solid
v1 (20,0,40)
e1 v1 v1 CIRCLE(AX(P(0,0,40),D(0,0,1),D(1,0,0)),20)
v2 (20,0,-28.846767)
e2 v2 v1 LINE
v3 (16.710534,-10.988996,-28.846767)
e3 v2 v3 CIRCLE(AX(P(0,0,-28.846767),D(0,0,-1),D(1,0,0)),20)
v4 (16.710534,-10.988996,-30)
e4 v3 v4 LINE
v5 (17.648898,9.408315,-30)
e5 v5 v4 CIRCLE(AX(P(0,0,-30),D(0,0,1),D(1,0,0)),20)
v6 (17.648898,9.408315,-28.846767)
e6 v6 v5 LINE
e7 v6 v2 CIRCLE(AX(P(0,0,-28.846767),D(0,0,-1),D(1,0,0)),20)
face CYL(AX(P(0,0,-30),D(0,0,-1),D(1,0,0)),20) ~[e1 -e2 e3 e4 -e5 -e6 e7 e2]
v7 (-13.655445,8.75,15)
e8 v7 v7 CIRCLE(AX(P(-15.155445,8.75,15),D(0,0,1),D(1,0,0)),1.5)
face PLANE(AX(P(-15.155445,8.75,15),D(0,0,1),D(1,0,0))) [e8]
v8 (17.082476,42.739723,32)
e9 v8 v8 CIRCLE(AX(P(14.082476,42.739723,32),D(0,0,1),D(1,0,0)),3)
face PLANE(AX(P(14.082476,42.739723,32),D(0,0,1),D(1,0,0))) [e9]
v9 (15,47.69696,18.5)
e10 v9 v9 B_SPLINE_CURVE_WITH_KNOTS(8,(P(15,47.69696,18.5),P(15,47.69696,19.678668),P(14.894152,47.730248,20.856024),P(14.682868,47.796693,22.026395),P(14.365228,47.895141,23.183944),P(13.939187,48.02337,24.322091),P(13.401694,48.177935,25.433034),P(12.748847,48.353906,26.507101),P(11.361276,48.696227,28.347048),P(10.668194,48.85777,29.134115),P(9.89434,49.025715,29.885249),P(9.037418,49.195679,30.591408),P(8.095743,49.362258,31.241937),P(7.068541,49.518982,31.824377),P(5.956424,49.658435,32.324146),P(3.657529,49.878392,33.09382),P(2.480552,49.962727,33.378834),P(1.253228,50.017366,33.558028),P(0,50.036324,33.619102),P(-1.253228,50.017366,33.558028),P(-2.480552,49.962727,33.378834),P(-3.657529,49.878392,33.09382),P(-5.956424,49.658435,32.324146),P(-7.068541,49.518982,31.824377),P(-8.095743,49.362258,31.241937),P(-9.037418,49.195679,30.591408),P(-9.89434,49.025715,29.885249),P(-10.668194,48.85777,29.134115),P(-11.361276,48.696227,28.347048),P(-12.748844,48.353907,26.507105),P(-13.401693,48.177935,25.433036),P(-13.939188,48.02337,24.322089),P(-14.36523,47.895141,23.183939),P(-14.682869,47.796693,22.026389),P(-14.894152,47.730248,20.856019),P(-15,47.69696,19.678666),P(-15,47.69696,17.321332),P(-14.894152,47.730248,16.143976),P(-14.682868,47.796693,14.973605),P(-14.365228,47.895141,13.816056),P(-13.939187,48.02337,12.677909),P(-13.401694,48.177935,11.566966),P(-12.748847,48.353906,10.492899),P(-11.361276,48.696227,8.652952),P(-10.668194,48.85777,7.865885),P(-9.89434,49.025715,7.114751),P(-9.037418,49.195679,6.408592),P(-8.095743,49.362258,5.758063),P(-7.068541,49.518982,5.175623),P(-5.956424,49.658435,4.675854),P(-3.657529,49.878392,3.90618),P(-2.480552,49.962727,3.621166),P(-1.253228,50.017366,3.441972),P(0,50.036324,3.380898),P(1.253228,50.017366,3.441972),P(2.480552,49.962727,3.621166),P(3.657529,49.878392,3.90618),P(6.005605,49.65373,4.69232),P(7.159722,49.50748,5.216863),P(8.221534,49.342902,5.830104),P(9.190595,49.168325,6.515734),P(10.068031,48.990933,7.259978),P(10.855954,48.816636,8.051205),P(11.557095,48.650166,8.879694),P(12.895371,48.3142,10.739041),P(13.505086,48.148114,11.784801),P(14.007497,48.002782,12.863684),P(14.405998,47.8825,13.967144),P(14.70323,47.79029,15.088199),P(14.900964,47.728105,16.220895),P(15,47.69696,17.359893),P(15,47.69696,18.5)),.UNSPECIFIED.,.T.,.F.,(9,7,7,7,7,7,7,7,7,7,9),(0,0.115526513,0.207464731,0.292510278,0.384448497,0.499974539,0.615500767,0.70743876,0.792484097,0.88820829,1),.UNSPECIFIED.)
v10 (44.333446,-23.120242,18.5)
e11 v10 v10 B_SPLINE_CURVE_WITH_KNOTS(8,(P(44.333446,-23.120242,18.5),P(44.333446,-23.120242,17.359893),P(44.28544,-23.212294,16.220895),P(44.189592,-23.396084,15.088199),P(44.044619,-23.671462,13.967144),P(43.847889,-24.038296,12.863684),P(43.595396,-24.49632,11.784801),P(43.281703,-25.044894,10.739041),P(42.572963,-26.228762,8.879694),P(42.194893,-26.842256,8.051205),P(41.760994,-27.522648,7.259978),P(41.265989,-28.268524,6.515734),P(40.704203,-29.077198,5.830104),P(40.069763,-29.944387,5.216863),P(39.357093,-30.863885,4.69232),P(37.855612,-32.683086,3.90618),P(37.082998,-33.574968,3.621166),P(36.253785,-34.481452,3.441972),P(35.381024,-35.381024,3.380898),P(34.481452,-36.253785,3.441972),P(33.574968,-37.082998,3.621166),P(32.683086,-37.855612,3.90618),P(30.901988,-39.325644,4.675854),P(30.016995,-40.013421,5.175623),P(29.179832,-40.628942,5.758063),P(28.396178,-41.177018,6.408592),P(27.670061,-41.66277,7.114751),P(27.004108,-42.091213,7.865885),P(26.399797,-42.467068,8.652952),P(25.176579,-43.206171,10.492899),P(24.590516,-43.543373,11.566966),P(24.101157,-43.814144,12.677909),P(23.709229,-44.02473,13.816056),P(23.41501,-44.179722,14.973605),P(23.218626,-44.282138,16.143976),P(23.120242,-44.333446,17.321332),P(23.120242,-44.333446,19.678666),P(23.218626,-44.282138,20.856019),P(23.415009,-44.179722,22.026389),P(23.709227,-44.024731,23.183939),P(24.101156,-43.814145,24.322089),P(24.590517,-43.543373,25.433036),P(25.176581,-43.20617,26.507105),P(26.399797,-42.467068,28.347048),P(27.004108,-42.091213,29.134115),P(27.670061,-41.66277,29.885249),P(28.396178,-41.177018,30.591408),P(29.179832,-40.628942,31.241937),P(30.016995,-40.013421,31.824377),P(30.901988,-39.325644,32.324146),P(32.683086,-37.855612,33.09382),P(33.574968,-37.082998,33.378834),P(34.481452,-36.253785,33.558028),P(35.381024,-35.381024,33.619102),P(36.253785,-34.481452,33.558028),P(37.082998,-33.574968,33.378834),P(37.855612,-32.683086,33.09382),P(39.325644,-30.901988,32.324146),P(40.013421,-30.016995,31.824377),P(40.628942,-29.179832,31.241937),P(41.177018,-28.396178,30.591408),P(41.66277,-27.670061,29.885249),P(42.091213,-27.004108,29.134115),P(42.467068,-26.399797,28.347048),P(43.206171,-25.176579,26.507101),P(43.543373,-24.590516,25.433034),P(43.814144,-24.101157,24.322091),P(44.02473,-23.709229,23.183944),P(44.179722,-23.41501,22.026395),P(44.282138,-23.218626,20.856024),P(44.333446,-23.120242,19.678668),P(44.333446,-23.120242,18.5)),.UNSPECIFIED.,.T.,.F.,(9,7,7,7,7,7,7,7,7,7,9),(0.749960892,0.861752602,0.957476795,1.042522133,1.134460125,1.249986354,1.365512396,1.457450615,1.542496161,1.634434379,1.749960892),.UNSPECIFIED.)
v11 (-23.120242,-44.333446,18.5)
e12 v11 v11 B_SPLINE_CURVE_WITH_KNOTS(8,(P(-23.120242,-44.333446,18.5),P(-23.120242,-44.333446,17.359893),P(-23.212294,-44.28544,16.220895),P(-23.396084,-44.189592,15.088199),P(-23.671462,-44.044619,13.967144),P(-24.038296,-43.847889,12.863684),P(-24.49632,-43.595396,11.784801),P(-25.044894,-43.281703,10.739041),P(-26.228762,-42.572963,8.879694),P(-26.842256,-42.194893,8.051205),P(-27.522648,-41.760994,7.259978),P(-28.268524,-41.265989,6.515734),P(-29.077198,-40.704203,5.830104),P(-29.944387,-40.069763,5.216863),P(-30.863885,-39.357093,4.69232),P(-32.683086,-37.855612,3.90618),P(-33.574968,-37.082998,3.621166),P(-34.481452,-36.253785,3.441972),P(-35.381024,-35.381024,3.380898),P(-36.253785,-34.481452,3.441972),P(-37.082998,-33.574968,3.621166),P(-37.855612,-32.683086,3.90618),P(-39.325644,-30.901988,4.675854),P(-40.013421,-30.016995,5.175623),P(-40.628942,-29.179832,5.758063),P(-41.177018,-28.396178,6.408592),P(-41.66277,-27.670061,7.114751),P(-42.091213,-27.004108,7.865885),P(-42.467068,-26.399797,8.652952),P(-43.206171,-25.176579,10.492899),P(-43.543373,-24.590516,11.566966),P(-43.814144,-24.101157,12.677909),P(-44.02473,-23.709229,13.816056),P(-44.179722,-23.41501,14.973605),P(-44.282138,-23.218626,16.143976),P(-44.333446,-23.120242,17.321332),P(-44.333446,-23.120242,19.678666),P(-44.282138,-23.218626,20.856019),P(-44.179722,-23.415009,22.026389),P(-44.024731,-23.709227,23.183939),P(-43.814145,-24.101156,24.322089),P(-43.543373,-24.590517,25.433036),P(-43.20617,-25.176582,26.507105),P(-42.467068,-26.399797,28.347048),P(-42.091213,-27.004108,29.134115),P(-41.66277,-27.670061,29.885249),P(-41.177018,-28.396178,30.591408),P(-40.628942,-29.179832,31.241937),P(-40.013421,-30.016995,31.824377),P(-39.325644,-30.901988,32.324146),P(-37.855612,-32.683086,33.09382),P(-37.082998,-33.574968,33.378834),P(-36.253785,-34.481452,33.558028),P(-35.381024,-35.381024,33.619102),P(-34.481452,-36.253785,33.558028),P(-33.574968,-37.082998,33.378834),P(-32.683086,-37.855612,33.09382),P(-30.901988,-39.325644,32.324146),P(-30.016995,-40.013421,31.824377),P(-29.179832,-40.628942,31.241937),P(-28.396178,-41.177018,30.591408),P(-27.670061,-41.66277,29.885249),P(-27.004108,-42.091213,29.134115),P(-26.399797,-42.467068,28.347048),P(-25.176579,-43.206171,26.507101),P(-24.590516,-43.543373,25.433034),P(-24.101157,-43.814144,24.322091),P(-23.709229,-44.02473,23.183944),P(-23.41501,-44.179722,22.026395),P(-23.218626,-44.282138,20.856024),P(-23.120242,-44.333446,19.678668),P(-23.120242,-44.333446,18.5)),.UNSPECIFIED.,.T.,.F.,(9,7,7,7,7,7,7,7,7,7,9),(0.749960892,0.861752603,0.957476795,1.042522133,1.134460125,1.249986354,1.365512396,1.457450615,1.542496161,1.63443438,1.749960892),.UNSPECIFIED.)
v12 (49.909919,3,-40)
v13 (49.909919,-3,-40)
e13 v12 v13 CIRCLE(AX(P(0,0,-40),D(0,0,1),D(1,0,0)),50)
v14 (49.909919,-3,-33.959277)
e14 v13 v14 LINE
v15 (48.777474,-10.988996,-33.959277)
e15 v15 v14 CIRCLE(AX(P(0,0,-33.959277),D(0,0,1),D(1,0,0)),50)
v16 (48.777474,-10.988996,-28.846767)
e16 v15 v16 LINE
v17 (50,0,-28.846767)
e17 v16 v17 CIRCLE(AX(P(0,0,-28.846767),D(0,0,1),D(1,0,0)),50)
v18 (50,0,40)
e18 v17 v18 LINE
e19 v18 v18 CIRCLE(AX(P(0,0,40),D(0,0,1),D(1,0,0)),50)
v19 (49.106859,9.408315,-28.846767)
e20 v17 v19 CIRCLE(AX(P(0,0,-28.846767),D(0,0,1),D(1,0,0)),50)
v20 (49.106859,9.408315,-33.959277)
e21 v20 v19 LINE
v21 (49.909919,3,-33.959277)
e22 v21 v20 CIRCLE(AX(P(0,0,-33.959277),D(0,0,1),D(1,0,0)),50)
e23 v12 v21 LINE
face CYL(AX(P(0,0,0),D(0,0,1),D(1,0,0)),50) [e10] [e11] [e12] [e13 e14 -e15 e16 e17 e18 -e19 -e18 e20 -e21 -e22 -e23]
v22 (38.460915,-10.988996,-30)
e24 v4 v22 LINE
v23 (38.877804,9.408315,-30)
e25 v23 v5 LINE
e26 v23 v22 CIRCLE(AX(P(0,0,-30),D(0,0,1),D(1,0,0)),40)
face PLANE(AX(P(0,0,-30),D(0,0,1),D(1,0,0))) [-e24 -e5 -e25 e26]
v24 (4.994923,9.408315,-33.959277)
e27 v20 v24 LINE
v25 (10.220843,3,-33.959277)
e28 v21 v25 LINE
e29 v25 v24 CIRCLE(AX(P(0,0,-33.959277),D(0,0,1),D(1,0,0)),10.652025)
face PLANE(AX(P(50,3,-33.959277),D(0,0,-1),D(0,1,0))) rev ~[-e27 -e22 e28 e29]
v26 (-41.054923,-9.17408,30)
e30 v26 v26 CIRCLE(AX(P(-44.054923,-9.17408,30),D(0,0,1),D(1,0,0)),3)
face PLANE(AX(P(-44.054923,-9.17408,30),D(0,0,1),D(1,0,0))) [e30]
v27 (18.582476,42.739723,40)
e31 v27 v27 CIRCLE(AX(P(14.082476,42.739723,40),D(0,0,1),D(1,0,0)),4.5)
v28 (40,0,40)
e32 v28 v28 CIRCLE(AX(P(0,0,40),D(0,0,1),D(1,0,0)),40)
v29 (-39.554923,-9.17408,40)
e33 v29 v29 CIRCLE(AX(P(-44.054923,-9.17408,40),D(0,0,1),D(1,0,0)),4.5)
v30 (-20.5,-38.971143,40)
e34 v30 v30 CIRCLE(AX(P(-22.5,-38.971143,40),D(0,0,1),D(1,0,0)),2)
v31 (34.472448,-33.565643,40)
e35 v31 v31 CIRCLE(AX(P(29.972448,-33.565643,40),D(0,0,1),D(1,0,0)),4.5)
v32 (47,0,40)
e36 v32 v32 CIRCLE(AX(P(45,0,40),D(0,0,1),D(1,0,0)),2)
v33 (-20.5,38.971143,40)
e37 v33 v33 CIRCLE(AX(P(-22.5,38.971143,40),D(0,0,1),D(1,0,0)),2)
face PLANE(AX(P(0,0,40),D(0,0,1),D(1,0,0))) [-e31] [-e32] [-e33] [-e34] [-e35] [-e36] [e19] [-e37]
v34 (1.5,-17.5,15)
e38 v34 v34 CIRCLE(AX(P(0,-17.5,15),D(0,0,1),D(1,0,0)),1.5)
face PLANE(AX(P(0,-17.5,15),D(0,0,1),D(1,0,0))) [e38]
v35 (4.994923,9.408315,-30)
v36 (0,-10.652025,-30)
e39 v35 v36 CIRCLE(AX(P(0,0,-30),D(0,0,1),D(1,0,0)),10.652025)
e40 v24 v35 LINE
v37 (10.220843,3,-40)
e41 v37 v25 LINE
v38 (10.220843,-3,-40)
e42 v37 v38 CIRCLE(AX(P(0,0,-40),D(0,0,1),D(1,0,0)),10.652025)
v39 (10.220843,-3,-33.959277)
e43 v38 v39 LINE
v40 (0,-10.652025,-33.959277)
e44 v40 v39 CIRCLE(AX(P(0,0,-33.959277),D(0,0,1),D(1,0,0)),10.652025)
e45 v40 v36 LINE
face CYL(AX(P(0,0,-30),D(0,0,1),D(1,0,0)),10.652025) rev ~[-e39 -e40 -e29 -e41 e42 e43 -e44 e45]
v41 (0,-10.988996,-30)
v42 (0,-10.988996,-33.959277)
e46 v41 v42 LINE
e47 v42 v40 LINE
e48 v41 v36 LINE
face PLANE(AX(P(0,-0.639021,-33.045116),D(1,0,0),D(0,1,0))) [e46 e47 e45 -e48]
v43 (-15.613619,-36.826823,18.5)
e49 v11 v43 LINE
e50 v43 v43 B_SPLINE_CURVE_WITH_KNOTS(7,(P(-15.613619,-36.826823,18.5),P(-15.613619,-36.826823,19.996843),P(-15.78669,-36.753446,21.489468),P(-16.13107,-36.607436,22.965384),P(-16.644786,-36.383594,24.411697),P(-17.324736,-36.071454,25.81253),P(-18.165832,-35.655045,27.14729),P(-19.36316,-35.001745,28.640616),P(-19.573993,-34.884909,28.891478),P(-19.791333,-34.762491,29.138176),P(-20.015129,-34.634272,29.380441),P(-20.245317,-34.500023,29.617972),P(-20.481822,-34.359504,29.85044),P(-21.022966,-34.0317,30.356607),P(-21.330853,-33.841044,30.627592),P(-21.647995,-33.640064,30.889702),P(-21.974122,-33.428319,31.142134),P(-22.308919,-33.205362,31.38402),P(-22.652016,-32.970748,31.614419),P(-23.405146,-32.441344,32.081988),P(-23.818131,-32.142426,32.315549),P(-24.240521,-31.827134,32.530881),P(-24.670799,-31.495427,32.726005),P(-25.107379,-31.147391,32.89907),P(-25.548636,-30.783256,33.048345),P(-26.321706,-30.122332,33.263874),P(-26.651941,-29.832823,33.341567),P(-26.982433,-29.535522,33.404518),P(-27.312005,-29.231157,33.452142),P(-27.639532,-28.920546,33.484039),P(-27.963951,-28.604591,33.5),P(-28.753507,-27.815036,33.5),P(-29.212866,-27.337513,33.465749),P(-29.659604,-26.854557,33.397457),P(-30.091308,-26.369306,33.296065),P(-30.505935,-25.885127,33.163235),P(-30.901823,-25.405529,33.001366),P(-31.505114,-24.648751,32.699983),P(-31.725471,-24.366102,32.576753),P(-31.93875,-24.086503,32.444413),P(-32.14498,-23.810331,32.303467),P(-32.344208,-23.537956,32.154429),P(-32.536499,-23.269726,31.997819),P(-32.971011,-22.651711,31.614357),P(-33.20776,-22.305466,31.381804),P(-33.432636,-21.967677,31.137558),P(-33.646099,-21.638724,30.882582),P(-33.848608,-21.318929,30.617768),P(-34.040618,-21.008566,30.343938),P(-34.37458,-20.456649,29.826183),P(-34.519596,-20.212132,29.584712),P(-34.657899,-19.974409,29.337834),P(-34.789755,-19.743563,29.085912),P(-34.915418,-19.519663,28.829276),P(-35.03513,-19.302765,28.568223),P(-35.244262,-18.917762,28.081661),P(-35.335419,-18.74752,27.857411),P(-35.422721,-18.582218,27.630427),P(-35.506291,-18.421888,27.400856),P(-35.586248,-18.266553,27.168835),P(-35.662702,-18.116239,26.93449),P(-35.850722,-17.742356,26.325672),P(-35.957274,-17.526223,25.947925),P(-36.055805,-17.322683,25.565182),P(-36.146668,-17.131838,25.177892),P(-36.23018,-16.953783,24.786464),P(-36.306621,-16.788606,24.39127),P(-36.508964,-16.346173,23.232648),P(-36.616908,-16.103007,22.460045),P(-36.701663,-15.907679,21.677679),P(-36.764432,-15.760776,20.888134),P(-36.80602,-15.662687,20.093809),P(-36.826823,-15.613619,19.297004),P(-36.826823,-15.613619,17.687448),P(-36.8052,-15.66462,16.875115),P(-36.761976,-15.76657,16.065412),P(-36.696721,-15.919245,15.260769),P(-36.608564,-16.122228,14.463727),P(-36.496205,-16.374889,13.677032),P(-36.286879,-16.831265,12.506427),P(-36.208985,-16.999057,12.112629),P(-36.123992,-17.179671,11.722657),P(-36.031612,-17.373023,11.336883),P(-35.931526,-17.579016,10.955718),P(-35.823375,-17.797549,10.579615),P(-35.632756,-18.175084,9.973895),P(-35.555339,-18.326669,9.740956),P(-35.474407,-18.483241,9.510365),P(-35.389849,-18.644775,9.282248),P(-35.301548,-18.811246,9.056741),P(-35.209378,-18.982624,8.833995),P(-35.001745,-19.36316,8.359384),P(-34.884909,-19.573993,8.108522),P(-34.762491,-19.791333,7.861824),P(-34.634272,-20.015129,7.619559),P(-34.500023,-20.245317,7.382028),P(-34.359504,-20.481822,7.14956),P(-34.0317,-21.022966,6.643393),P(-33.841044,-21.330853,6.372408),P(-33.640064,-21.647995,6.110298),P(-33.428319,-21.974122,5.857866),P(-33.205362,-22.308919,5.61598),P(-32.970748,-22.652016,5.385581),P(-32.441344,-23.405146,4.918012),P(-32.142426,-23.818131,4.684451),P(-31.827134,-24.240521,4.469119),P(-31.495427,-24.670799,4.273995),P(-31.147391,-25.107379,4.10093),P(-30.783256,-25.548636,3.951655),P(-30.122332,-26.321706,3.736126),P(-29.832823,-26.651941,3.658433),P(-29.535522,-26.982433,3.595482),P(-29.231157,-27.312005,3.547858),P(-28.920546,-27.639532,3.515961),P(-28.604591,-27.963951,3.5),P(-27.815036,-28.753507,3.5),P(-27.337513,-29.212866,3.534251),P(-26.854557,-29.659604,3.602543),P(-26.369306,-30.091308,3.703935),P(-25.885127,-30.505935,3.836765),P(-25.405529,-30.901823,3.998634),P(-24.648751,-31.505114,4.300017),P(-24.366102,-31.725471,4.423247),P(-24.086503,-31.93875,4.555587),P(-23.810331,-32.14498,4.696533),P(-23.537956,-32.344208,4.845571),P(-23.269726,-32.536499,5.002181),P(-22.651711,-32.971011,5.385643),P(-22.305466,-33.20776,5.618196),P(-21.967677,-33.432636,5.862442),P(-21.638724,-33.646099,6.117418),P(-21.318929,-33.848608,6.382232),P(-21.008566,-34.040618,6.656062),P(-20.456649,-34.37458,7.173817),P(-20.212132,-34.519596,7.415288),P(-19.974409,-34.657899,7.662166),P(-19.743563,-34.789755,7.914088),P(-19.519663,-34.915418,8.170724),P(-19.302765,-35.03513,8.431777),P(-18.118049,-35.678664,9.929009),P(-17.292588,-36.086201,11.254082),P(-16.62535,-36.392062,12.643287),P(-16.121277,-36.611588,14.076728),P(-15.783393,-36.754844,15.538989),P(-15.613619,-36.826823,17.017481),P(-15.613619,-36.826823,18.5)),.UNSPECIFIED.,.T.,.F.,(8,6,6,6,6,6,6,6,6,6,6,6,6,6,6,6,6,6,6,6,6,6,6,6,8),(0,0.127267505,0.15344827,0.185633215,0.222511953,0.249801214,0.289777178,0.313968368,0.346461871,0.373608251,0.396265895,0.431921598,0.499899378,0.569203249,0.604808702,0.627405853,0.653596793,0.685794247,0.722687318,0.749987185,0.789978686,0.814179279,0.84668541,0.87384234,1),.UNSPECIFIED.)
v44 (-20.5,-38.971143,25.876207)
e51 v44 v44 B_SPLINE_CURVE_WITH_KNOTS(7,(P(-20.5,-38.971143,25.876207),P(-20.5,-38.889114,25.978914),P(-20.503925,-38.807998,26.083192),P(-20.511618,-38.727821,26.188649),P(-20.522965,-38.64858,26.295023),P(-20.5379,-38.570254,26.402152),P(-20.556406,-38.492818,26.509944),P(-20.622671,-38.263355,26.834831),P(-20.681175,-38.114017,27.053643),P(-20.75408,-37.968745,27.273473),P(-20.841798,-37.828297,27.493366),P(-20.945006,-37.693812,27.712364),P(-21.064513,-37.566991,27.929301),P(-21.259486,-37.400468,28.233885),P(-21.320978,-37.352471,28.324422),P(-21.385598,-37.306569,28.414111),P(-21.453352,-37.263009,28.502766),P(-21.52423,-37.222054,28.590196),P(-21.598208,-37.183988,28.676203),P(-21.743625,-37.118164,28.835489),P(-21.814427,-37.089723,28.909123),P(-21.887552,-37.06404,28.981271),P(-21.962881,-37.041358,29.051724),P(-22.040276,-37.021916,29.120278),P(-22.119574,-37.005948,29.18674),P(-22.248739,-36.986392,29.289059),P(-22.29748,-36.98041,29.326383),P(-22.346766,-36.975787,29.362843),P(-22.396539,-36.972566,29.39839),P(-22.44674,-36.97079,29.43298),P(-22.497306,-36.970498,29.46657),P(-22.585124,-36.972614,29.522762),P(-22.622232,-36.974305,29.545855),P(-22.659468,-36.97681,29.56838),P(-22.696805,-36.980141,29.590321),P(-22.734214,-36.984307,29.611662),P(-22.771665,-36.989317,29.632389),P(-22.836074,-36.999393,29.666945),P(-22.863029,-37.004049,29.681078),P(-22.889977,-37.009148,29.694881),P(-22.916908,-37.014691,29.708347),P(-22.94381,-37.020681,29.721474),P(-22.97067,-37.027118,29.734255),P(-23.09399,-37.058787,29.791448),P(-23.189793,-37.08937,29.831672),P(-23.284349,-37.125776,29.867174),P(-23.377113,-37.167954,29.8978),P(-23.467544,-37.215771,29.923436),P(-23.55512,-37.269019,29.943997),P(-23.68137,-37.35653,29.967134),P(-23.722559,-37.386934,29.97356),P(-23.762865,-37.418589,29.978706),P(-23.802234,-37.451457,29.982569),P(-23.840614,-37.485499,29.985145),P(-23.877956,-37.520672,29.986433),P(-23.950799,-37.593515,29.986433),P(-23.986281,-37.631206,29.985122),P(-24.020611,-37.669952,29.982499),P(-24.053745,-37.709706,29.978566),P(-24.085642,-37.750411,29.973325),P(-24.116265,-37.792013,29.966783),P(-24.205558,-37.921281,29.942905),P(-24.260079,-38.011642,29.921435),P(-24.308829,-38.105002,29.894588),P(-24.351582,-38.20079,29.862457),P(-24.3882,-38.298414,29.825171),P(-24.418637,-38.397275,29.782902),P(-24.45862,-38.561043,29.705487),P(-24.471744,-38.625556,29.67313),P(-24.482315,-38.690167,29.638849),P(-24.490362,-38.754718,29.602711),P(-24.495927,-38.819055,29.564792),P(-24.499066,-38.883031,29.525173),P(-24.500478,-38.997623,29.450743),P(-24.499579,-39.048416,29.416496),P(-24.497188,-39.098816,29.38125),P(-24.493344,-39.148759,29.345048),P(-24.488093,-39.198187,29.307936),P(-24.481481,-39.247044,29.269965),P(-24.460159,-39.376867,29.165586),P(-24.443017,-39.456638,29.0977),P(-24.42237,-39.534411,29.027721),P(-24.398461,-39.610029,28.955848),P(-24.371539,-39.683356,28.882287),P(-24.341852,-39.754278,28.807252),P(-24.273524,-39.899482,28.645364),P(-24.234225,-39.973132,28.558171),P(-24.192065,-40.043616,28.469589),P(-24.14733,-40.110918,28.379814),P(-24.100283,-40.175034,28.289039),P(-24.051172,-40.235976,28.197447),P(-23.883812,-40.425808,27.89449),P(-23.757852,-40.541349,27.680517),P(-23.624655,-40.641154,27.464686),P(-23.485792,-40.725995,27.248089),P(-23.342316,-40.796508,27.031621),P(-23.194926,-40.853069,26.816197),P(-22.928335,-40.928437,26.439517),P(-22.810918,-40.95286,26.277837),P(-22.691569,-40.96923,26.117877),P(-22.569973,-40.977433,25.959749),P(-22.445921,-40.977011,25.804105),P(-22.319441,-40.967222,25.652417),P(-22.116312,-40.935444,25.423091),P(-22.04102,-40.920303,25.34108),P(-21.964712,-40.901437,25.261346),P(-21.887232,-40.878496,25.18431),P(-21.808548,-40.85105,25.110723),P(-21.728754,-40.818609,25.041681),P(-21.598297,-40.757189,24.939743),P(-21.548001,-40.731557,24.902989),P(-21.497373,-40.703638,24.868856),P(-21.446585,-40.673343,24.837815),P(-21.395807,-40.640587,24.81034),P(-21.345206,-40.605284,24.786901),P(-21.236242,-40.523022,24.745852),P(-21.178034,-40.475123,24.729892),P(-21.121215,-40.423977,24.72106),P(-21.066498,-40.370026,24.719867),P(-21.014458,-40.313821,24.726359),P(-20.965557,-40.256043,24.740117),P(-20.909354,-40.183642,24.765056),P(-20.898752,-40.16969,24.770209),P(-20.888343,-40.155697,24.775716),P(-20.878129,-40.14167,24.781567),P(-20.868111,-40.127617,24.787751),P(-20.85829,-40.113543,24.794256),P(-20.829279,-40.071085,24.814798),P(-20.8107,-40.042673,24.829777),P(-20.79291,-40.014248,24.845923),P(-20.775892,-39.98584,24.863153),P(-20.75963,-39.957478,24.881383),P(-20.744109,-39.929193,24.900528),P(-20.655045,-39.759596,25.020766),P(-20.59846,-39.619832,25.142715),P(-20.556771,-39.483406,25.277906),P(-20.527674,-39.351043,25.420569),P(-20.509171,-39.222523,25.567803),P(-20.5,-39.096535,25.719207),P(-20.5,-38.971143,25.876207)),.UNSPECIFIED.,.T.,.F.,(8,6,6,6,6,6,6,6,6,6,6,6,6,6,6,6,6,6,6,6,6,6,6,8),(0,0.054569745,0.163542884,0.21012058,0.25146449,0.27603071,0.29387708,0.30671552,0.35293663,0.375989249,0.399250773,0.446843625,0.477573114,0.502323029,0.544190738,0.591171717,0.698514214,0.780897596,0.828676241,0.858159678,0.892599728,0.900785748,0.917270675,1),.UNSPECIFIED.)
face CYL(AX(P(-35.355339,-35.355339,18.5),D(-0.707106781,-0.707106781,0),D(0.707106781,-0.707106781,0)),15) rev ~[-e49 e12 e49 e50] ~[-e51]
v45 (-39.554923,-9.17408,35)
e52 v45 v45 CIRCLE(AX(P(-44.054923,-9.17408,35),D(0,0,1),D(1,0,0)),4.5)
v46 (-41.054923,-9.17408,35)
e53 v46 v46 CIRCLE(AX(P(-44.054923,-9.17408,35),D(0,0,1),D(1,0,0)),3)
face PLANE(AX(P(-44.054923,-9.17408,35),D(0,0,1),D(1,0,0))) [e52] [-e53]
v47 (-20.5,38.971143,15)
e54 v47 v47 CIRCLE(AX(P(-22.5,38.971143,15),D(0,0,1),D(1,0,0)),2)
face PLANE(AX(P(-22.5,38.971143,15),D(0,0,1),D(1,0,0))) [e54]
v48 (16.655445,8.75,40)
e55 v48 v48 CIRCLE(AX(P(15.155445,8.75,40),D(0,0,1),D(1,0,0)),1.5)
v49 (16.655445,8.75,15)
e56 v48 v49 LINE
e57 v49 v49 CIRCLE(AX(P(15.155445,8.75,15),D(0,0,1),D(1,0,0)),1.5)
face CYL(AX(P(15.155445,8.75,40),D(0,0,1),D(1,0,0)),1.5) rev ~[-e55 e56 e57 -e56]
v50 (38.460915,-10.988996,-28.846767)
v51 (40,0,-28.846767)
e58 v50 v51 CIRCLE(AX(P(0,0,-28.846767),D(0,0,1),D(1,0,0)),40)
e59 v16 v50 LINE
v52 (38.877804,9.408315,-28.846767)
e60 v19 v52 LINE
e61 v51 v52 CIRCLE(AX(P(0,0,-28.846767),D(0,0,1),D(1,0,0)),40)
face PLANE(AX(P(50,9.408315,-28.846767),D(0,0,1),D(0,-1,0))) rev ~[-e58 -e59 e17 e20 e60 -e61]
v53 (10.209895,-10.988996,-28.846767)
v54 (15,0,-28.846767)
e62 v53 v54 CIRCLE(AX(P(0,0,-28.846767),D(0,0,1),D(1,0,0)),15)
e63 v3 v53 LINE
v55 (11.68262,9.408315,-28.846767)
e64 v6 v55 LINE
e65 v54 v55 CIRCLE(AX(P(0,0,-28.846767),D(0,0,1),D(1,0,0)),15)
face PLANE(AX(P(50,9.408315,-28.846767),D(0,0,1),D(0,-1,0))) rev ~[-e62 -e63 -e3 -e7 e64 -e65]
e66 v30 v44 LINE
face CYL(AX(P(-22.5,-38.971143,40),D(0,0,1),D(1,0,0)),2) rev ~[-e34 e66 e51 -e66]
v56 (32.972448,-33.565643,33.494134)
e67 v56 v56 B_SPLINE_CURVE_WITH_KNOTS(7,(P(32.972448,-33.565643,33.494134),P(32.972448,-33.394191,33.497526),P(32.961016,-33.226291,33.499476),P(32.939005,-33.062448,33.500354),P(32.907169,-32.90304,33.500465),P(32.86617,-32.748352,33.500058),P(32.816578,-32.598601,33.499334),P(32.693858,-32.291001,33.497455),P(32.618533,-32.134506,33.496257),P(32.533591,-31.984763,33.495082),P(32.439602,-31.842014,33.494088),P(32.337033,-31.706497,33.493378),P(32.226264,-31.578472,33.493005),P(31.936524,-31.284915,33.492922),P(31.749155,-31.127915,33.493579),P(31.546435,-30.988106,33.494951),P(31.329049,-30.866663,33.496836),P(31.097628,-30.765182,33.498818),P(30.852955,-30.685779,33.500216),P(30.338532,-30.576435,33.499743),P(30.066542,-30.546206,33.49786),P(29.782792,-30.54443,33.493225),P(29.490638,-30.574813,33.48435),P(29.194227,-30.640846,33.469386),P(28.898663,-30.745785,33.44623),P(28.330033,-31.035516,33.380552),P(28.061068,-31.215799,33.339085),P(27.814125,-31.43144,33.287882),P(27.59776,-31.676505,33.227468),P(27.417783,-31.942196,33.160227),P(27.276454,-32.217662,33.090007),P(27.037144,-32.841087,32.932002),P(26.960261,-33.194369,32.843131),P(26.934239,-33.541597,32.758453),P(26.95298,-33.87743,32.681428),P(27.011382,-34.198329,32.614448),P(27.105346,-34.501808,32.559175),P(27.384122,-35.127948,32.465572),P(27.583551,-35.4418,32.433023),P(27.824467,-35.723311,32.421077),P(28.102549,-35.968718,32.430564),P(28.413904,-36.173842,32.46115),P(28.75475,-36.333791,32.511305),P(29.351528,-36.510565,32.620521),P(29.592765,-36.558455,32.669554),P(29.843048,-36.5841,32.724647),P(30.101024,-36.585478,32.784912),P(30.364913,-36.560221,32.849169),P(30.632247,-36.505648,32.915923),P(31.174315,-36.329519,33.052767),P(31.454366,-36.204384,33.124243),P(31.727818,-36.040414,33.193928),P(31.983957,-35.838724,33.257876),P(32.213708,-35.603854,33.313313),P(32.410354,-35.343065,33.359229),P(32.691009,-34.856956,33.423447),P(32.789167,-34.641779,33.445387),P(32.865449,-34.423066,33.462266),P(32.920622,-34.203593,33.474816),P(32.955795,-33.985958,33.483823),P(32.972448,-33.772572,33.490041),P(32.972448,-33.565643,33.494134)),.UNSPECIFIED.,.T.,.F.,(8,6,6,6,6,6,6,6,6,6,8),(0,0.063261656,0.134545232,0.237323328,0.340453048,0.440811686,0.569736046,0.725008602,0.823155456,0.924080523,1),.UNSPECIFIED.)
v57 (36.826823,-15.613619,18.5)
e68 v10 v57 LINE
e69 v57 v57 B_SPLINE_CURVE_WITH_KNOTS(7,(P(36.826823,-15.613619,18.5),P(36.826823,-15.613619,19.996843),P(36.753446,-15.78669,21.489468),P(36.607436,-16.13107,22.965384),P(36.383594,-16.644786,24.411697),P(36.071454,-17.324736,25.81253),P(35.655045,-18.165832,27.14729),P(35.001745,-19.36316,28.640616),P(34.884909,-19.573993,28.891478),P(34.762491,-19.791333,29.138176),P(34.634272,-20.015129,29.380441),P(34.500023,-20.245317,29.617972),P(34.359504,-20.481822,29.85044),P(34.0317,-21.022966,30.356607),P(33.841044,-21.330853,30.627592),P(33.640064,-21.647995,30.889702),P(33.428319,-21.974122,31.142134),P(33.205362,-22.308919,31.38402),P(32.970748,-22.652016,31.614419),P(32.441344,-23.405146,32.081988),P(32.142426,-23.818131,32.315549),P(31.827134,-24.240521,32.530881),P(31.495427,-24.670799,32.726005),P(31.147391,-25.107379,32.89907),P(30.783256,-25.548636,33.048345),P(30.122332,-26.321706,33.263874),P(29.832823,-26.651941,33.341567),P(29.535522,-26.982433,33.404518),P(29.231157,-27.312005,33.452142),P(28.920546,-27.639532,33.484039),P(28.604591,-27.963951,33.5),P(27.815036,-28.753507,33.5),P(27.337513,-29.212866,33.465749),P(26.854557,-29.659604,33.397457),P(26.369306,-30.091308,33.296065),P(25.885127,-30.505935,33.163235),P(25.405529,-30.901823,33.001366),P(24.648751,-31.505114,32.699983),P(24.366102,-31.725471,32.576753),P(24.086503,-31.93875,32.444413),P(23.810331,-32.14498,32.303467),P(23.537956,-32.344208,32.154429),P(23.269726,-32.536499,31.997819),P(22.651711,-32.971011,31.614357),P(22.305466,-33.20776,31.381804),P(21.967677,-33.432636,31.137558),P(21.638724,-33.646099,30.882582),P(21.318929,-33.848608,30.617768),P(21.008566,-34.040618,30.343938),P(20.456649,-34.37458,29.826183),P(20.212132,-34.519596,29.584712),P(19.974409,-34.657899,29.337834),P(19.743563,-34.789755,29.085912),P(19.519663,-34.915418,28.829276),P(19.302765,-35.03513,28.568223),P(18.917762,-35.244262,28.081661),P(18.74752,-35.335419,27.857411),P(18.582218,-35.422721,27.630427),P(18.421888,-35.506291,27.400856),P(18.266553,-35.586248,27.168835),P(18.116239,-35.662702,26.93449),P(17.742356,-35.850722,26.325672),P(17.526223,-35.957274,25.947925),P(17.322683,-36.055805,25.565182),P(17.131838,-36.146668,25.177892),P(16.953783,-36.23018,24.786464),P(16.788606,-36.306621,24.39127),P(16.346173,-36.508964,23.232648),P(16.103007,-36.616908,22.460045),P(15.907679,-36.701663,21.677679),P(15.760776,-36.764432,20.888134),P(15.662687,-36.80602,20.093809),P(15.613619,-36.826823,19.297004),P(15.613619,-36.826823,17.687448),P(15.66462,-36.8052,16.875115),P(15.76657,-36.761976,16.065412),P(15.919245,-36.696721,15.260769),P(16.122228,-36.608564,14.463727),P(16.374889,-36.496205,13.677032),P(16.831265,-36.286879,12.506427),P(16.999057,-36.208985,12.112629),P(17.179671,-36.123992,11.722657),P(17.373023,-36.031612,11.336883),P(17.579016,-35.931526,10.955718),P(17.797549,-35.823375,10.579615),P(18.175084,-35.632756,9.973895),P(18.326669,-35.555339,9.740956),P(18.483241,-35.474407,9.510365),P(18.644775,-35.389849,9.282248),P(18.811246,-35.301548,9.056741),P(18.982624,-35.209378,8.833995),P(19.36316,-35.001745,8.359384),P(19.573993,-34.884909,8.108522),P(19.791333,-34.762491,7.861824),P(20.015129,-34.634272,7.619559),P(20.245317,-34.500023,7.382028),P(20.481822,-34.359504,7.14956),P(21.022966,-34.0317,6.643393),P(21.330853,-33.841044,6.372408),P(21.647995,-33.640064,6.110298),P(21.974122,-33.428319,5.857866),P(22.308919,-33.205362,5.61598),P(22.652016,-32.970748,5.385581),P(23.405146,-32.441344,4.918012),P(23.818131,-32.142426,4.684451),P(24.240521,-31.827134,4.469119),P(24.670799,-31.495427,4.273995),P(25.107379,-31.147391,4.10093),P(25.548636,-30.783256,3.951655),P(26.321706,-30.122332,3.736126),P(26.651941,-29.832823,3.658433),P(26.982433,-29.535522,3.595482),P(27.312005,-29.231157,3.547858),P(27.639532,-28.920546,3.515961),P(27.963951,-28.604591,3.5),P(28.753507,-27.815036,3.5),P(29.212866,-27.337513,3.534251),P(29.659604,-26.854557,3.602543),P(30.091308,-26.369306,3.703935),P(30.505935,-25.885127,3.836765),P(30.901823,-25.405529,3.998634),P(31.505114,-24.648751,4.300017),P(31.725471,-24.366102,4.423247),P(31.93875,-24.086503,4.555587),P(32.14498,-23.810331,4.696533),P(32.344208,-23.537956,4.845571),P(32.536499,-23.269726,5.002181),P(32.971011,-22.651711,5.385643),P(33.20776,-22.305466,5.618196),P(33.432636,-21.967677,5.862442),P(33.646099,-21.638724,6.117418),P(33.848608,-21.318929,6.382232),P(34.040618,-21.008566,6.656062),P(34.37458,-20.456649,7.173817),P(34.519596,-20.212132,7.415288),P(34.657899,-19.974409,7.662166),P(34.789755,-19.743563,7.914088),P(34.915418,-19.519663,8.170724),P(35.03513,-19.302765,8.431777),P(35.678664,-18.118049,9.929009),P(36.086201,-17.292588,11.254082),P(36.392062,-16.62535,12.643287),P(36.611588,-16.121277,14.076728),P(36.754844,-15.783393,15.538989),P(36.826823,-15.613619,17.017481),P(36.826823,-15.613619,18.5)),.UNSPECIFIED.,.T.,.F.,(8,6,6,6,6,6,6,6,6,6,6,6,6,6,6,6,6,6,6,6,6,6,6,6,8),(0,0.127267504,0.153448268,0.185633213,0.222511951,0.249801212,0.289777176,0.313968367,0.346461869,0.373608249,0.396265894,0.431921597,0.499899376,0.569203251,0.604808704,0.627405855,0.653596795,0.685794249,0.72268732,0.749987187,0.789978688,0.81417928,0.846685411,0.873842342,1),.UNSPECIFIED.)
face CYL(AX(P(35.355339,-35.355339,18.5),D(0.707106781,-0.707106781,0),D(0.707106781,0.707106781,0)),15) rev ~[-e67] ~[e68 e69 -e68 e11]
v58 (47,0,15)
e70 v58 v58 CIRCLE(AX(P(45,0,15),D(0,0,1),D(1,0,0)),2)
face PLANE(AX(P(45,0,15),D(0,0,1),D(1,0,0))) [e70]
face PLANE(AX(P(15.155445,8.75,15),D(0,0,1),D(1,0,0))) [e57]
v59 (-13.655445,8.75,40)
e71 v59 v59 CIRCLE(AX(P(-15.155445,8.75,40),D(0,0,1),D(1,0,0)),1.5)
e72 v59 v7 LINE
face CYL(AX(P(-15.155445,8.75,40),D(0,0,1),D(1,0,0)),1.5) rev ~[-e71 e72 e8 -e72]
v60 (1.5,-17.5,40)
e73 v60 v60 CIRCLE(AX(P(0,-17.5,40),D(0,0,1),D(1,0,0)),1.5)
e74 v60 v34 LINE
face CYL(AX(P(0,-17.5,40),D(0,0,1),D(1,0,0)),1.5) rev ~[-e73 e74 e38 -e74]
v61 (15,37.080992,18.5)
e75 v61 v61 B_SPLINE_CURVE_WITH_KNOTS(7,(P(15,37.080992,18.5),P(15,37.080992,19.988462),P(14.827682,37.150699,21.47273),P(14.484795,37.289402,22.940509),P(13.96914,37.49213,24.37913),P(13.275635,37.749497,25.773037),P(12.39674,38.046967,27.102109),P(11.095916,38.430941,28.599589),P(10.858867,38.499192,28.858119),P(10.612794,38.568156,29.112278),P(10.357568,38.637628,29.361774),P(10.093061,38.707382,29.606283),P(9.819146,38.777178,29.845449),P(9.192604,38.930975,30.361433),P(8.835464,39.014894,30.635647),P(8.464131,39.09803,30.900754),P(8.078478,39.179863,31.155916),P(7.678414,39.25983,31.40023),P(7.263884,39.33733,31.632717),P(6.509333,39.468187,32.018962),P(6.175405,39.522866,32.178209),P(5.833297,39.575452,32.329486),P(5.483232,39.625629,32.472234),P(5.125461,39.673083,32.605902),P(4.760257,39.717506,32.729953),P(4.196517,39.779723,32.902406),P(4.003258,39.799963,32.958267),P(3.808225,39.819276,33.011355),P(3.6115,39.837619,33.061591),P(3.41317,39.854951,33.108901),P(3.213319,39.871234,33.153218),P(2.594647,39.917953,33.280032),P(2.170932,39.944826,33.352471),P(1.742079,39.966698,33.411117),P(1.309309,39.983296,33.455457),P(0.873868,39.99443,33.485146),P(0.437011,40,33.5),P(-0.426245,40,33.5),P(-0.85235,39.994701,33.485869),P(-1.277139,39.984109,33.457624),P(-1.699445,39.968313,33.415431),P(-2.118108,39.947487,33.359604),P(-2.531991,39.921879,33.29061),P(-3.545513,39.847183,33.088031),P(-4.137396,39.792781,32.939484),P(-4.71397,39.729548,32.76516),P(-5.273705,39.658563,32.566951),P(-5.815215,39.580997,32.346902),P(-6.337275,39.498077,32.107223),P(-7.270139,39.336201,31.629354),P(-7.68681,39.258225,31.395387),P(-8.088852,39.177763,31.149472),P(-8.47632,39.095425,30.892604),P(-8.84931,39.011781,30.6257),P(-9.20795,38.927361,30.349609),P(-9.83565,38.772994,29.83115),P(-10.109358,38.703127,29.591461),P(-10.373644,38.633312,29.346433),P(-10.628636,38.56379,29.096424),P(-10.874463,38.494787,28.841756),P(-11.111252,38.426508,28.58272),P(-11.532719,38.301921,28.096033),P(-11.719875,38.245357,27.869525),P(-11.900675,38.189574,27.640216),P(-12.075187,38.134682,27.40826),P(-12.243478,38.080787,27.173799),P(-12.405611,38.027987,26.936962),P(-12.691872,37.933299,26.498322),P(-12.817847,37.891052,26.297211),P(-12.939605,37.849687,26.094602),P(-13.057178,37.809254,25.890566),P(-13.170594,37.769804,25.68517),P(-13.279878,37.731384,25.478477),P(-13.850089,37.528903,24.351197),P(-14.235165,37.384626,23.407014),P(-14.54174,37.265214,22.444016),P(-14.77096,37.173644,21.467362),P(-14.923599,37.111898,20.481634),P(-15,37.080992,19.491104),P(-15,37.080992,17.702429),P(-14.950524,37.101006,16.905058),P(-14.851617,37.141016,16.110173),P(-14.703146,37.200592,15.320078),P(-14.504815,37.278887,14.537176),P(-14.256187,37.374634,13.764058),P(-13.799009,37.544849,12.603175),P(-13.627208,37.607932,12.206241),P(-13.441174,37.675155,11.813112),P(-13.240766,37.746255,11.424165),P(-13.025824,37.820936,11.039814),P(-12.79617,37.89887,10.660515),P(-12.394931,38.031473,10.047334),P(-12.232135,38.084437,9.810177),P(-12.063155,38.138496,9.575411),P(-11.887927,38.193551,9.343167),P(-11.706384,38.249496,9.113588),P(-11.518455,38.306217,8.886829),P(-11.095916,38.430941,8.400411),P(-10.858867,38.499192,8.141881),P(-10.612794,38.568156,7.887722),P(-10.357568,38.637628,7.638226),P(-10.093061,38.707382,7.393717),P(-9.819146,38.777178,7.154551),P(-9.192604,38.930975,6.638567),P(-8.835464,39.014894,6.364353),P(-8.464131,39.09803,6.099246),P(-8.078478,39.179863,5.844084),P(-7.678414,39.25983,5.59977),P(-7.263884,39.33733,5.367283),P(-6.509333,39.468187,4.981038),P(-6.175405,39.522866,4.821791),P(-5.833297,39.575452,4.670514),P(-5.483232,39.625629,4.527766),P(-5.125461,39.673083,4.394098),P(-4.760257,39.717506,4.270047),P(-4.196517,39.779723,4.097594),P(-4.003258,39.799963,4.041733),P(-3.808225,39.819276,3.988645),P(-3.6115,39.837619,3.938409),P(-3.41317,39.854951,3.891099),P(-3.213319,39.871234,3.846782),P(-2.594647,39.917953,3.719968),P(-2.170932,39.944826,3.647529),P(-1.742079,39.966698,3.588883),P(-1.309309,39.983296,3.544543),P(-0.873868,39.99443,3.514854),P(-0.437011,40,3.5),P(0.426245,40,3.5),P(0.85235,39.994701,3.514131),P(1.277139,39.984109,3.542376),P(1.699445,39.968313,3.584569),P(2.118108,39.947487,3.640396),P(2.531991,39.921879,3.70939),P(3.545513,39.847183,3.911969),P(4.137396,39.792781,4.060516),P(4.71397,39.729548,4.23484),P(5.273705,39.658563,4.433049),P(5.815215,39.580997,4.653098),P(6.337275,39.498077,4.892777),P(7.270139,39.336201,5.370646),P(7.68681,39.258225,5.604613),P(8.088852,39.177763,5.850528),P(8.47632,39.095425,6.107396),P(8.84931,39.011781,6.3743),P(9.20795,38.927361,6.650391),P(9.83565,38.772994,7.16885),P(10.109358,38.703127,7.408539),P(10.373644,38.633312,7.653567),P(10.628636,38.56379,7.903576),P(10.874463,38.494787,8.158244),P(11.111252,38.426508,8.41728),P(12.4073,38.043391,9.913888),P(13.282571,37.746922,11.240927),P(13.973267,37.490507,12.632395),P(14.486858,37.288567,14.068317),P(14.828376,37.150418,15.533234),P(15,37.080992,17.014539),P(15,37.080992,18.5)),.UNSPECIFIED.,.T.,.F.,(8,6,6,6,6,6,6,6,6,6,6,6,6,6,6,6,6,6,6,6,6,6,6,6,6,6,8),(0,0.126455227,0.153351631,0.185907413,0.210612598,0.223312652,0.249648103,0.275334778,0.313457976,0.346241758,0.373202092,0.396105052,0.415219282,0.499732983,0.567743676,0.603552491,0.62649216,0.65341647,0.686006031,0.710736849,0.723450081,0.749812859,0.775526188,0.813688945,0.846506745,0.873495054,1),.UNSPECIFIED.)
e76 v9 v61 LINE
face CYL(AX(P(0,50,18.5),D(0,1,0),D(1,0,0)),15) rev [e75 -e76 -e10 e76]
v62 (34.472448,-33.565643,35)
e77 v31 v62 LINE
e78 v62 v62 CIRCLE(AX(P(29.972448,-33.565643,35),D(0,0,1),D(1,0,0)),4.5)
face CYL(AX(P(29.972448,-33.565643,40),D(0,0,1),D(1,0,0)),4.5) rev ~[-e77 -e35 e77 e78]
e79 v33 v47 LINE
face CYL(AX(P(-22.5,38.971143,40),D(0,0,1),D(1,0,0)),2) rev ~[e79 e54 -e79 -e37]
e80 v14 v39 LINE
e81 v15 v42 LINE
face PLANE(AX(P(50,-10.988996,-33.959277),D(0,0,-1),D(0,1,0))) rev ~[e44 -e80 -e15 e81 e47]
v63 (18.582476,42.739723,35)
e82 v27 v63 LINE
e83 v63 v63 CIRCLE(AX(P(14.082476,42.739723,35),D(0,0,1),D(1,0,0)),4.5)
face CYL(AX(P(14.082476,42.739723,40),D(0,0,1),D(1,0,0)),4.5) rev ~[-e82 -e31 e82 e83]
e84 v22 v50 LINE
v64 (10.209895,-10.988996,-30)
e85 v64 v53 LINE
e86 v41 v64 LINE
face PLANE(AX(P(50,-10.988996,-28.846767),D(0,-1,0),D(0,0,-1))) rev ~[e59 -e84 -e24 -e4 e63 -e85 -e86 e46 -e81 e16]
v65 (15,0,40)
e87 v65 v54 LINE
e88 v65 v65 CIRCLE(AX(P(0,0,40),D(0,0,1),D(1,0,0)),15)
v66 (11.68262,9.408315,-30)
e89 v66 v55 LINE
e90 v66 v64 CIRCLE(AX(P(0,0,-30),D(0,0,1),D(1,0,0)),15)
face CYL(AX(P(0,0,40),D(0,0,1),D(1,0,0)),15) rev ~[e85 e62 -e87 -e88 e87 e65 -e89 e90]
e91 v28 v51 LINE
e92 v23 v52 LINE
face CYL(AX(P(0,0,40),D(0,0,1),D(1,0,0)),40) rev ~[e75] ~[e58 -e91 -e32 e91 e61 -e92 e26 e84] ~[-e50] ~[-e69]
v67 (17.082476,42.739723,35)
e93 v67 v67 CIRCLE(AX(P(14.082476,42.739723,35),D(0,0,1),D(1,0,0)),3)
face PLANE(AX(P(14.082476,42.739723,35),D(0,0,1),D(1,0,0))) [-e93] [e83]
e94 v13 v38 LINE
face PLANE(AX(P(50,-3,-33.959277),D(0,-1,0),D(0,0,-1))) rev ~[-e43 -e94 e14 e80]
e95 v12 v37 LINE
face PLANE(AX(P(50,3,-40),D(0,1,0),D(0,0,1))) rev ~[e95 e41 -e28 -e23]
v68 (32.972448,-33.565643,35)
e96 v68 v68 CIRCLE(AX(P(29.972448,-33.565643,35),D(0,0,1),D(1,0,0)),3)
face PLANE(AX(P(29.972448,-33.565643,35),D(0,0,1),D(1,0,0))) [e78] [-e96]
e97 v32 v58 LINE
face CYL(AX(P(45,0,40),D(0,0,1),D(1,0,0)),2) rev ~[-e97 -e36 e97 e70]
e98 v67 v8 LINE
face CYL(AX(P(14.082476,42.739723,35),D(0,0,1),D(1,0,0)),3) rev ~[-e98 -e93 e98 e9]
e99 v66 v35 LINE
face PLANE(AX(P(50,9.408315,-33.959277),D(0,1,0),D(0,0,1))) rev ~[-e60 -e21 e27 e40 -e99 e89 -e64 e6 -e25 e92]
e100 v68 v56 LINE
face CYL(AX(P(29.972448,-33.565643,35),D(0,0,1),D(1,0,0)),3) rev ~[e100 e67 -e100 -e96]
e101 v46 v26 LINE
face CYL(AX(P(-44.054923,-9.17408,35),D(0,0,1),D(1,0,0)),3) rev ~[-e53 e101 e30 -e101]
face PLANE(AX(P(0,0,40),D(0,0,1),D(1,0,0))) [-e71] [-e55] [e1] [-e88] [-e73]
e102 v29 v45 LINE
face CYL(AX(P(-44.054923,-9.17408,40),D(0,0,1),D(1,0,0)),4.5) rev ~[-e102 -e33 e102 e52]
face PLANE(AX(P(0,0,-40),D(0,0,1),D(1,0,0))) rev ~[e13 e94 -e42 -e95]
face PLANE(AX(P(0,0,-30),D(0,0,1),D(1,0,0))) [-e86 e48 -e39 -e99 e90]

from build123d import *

# Parameters (mm, degrees)
F0_R      = 50
F1_DEPTH  = 40
F2_R      = 40
F3_DEPTH  = 70
F4_R      = 20
F5_DEPTH  = 70
F6_R      = 15
F7_DEPTH  = 70
F8_R      = 4.5
F9_DEPTH  = 5
F10_R     = 3
F11_DEPTH = 3
F12_R     = 3
F13_DEPTH = 5
F14_R     = 3
F15_DEPTH = 5
F16_DEPTH = 5
F17_R     = 2
F18_DEPTH = 25
F19_R     = 1.5
F20_DEPTH = 25
F22_R     = 15
F23_DEPTH = 15
F26_R     = 15
F27_DEPTH = 25
F32_R     = 15
F33_DEPTH = 25
F35_DEPTH = 50
F36_R     = 10.6520252132
F37_DEPTH = 25


with BuildPart() as f1:
    # F0 (on Top) → F1 (new body, symmetric)
    with BuildSketch(Plane.XY):
        Circle(F0_R)
    extrude(amount=F1_DEPTH, both=True)

    # F2 (on face) → F3 (cut)
    with BuildSketch(Plane.XY.offset(40)):
        Circle(F2_R)
    extrude(amount=-F3_DEPTH, mode=Mode.SUBTRACT)

    # F4 (on face) → F5 (join)
    with BuildSketch(Plane.XY.offset(-30)):
        Circle(F4_R)
    extrude(amount=F5_DEPTH)

    # F6 (on face) → F7 (cut)
    with BuildSketch(Plane.XY.offset(40)):
        Circle(F6_R)
    extrude(amount=-F7_DEPTH, mode=Mode.SUBTRACT)

    # F8 (on face) → F9 (cut)
    with BuildSketch(Plane.XY.offset(40)):
        with Locations((-44.0549232574, -9.1740796152)):
            Circle(F8_R)
        with Locations((29.9724476318, -33.5656428951)):
            Circle(F8_R)
        with Locations((14.0824756256, 42.7397225103)):
            Circle(F8_R)
    extrude(amount=-F9_DEPTH, mode=Mode.SUBTRACT)

    # F10 (on face) → F11 (cut)
    with BuildSketch(Plane.XY.offset(35)):
        with Locations((14.0824756256, 42.7397225103)):
            Circle(F10_R)
    extrude(amount=-F11_DEPTH, mode=Mode.SUBTRACT)

    # F12 (on face) → F13 (cut)
    with BuildSketch(Plane.XY.offset(35)):
        with Locations((-44.0549232574, -9.1740796152)):
            Circle(F12_R)
    extrude(amount=-F13_DEPTH, mode=Mode.SUBTRACT)

    # F14 (on face) → F15 (cut)
    with BuildSketch(Plane.XY.offset(35)):
        with Locations((29.9724476318, -33.5656428951)):
            Circle(F14_R)
    extrude(amount=F15_DEPTH, mode=Mode.SUBTRACT)

    # F14 (on face) → F16 (cut)
    with BuildSketch(Plane.XY.offset(35)):
        with Locations((29.9724476318, -33.5656428951)):
            Circle(F14_R)
    extrude(amount=-F16_DEPTH, mode=Mode.SUBTRACT)

    # F17 (on face) → F18 (cut)
    with BuildSketch(Plane.XY.offset(40)):
        with Locations((-22.5, 38.9711431703)):
            Circle(F17_R)
        with Locations((-22.5, -38.9711431703)):
            Circle(F17_R)
        with Locations((45, 0)):
            Circle(F17_R)
    extrude(amount=-F18_DEPTH, mode=Mode.SUBTRACT)

    # F19 (on face) → F20 (cut)
    with BuildSketch(Plane.XY.offset(40)):
        with Locations((-15.1554445662, 8.75)):
            Circle(F19_R)
        with Locations((15.1554445662, 8.75)):
            Circle(F19_R)
        with Locations((0, -17.5)):
            Circle(F19_R)
    extrude(amount=-F20_DEPTH, mode=Mode.SUBTRACT)

    # F22 (on offset) → F23 (cut)
    with BuildSketch(Plane.XZ.offset(-50)):
        with Locations((0, 18.5)):
            Circle(F22_R)
    extrude(amount=F23_DEPTH, mode=Mode.SUBTRACT)

    # F26 (on face) → F27 (cut)
    with BuildSketch(Plane(origin=(-35.3553390593, -35.3553390593, 0), x_dir=(0.7071067812, -0.7071067812, 0), z_dir=(-0.7071067812, -0.7071067812, 0))):
        with Locations((0, 18.5)):
            Circle(F26_R)
    extrude(amount=-F27_DEPTH, mode=Mode.SUBTRACT)

    # F32 (on face) → F33 (cut)
    with BuildSketch(Plane(origin=(35.3553390593, -35.3553390593, 0), x_dir=(0.7071067812, 0.7071067812, 0), z_dir=(0.7071067812, -0.7071067812, 0))):
        with Locations((0, 18.5)):
            Circle(F32_R)
    extrude(amount=-F33_DEPTH, mode=Mode.SUBTRACT)

    # F34 (on offset) → F35 (cut)
    with BuildSketch(Plane.YZ.offset(50)):
        Polygon((-3, -33.9592769742), (-3, -40), (0, -40), (3, -40), (3, -33.9592769742), (9.4083147123, -33.9592769742), (9.4083147123, -28.8467667997), (-10.9889963642, -28.8467667997), (-10.9889963642, -33.9592769742), align=None)
    extrude(amount=-F35_DEPTH, mode=Mode.SUBTRACT)

    # F36 (on face) → F37 (cut)
    with BuildSketch(Plane.XY.offset(-30)):
        Circle(F36_R)
    extrude(amount=-F37_DEPTH, mode=Mode.SUBTRACT)


solid = f1.part
